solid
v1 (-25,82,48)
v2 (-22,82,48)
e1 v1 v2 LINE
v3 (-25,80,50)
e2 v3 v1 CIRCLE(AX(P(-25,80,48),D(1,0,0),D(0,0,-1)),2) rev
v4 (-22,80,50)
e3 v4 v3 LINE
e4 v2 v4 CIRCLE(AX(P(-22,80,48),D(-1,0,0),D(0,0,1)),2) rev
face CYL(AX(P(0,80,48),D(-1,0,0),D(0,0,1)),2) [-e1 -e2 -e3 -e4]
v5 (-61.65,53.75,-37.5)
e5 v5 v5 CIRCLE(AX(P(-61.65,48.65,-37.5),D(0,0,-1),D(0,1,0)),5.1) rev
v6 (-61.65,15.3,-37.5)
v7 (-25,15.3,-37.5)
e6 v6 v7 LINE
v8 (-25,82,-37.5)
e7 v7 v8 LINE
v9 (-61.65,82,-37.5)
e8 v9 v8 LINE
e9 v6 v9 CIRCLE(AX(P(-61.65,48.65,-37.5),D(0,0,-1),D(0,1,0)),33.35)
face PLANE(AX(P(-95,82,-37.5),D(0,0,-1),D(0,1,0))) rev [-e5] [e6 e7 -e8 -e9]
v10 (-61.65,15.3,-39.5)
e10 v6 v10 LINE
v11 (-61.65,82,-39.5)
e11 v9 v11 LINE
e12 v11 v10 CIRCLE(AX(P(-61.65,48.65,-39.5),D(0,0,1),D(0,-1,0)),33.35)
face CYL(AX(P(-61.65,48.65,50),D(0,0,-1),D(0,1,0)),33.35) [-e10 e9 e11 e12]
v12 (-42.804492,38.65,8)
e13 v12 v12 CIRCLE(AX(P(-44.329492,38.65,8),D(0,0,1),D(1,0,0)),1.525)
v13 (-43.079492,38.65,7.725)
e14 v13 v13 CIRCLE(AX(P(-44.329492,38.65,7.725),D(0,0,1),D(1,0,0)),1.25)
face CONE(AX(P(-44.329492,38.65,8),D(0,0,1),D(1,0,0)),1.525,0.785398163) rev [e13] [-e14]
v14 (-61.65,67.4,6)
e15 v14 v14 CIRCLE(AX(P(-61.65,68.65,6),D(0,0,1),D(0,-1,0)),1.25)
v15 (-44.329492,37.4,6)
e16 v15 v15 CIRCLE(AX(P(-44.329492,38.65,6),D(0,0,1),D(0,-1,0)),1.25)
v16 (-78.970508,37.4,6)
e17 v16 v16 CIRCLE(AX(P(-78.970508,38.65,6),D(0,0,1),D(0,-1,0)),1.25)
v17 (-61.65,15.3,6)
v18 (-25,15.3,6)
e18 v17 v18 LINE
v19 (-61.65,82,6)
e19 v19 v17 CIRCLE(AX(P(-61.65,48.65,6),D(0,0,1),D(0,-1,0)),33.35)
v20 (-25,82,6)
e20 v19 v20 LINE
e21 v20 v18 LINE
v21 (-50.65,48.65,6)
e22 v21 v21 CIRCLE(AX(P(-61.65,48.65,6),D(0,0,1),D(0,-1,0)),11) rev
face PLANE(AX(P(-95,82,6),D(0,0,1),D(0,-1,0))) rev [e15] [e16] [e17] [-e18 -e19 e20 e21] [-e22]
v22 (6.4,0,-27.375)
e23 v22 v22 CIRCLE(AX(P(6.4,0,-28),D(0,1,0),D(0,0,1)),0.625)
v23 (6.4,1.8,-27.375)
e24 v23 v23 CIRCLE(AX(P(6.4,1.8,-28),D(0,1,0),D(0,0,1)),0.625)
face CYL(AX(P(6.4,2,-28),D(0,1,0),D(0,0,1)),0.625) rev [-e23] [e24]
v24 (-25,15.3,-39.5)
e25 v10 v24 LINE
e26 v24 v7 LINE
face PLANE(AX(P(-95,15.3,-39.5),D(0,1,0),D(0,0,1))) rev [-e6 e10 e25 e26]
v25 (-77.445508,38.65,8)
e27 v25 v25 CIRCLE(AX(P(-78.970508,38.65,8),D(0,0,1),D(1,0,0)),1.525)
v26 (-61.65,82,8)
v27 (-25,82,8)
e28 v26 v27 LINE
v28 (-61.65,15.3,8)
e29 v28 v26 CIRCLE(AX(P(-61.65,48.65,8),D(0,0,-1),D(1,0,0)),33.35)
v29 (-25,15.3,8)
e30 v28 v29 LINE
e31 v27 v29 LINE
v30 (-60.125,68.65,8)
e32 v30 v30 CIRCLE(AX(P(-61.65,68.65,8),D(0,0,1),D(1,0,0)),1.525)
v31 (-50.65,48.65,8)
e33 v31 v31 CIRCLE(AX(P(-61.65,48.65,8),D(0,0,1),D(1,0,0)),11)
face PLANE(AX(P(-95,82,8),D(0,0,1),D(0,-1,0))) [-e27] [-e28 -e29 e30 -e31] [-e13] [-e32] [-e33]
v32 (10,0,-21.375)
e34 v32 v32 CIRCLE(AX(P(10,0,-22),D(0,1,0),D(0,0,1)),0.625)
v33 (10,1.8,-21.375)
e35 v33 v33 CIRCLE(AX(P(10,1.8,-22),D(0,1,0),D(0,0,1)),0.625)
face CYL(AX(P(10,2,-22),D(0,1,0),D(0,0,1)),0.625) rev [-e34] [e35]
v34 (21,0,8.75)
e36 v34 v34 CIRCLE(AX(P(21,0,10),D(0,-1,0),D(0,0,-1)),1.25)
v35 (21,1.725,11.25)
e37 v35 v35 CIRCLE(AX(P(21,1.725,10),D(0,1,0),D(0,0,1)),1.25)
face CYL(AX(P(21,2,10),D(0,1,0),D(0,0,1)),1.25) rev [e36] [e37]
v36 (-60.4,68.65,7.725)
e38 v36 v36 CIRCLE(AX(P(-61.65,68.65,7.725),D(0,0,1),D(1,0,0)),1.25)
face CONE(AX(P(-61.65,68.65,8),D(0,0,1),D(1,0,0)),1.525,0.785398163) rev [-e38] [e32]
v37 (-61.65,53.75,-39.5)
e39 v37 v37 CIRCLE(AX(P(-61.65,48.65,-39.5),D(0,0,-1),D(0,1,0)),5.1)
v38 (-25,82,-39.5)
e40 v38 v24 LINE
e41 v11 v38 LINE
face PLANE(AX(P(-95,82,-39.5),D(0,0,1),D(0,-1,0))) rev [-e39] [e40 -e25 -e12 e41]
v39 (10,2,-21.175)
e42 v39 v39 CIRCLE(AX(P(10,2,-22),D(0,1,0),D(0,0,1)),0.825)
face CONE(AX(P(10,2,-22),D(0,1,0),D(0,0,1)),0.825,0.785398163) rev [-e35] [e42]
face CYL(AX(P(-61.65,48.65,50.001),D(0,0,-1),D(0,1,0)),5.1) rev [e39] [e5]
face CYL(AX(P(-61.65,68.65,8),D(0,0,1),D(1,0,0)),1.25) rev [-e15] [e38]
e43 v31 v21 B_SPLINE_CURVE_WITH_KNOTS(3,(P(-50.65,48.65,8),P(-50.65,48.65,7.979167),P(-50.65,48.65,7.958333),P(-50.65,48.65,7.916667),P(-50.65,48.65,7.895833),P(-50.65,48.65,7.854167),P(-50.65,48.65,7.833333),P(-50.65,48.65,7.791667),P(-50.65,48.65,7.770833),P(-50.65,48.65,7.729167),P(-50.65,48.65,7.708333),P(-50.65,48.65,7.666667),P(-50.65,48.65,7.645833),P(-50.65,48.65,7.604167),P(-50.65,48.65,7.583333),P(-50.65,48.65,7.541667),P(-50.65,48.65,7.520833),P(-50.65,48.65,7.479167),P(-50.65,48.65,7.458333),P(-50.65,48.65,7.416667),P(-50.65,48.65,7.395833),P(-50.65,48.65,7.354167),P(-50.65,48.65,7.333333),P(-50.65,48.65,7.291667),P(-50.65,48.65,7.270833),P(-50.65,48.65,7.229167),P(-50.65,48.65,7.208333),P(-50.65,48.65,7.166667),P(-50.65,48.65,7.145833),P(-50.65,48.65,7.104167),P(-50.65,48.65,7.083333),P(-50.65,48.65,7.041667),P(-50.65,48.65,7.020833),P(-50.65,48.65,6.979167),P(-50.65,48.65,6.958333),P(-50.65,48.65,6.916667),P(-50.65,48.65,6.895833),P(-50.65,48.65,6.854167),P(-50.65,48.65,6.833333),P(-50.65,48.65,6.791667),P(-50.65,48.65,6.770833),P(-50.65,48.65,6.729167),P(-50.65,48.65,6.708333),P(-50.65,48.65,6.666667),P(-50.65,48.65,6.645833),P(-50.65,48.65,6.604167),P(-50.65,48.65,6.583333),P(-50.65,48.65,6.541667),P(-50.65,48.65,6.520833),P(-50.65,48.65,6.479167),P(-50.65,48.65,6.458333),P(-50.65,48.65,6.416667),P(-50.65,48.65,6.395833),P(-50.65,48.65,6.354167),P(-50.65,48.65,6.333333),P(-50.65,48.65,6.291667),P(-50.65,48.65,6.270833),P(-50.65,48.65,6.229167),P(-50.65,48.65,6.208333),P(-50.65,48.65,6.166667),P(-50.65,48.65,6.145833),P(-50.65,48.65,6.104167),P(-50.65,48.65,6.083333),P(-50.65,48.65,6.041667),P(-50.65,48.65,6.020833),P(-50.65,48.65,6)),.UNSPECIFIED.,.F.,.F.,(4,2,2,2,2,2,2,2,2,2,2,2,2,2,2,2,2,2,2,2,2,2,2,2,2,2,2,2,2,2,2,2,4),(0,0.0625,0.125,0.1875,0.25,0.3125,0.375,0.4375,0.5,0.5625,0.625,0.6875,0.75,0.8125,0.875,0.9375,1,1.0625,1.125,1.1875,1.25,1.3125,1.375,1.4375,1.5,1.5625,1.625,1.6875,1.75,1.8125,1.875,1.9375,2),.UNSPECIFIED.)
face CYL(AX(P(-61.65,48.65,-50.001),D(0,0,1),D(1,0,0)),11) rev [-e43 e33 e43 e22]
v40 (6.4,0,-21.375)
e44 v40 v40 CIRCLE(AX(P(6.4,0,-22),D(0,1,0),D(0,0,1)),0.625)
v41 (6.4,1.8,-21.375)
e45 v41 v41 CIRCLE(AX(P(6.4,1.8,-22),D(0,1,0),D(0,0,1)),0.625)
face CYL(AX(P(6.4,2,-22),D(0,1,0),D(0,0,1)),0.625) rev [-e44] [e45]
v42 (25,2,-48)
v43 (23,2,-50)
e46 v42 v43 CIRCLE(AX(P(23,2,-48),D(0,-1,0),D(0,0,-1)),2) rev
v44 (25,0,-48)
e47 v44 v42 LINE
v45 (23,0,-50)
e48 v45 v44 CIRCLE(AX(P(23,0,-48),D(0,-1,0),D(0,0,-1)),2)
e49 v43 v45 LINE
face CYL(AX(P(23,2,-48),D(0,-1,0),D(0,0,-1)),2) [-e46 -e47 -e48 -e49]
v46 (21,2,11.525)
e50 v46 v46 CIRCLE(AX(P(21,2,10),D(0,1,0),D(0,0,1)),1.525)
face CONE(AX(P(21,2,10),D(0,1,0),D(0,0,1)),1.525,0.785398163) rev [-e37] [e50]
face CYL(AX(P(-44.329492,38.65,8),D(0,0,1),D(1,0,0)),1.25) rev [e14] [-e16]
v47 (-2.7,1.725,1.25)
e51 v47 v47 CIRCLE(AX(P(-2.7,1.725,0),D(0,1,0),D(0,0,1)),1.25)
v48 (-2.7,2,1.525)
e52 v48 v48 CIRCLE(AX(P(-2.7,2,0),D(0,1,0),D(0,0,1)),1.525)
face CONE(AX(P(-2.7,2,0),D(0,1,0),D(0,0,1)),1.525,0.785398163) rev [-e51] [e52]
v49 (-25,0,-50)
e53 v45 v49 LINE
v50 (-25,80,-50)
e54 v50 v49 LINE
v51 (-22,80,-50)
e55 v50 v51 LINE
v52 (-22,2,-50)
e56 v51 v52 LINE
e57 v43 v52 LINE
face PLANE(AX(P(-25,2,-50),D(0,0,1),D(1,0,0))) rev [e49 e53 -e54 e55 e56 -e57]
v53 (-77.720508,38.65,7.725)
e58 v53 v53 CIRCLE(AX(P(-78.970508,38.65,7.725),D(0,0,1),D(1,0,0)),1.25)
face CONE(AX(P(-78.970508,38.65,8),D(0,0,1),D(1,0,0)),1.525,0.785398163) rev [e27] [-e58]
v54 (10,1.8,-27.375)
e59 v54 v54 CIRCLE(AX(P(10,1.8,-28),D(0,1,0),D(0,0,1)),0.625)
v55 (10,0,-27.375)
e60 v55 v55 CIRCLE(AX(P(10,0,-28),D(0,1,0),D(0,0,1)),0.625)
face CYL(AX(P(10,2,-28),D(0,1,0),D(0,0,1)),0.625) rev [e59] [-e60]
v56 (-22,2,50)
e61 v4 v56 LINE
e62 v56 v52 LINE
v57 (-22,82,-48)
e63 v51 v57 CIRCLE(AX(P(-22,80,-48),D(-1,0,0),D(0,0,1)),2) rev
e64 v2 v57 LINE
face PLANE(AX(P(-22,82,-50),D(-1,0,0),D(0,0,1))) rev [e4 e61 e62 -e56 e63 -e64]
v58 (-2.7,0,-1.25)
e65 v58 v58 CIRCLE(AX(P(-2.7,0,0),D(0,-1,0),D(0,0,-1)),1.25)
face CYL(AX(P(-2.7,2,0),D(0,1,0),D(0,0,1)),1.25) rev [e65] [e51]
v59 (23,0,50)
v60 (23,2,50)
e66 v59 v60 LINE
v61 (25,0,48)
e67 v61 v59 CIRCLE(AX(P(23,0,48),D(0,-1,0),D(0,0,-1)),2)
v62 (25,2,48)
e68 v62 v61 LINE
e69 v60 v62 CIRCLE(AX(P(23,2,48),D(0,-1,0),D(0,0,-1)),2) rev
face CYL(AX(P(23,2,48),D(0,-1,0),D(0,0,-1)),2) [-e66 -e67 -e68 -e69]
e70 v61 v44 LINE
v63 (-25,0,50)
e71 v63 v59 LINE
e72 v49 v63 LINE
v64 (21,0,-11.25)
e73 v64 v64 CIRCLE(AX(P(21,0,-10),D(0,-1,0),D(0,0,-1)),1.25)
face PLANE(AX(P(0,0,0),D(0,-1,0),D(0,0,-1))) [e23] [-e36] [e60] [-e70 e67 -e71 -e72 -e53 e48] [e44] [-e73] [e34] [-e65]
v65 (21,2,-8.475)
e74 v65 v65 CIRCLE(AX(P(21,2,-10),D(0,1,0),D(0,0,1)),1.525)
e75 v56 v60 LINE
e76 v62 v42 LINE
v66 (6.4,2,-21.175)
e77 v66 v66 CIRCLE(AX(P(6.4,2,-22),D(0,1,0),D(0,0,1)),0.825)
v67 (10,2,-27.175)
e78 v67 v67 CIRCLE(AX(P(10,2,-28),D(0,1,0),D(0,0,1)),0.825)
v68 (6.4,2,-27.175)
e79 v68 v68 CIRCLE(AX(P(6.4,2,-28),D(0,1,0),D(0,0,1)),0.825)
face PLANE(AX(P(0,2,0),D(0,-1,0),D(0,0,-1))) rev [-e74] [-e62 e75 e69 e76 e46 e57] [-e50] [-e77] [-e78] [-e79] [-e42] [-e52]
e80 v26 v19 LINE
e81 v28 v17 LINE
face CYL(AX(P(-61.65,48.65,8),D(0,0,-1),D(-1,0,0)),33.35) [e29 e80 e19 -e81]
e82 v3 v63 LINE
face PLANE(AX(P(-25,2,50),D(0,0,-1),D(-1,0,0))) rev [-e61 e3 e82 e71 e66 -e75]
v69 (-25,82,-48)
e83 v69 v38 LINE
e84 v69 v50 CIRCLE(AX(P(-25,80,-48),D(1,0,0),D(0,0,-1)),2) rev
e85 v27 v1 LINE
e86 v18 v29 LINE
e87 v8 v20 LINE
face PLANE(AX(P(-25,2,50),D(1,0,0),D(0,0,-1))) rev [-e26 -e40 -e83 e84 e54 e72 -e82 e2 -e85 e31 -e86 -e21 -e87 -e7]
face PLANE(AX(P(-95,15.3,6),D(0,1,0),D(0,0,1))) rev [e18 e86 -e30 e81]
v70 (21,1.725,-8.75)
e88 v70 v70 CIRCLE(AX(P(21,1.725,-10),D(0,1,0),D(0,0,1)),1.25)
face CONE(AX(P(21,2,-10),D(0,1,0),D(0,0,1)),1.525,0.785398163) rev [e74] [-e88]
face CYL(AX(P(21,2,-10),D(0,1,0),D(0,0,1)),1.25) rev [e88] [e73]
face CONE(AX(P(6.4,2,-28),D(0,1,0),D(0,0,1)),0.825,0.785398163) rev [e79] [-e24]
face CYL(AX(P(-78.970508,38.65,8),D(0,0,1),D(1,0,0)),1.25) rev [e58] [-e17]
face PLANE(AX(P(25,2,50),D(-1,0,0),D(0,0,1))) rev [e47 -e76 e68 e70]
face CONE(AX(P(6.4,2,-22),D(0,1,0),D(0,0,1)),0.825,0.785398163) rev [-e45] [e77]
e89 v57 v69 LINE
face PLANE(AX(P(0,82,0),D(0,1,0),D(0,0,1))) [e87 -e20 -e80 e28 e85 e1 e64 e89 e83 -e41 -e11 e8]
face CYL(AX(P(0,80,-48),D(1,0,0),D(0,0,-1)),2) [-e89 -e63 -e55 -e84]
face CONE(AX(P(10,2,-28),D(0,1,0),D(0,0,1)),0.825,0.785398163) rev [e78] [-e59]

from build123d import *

# Parameters (mm, degrees)
SKETCH_1_W                   = 50
SKETCH_1_H                   = 100
EXTRUDE_1_DEPTH              = 2
SKETCH_2_W                   = 3
SKETCH_2_H                   = 100
EXTRUDE_2_DEPTH              = 80
SKETCH_3_W                   = 2
SKETCH_3_H                   = 66.7
EXTRUDE_3_DEPTH              = 70
CUT_EXTRUDE_4_REACH          = 162.465
SKETCH_8_W                   = 2
SKETCH_8_H                   = 66.7
EXTRUDE_4_DEPTH              = 70
CUT_EXTRUDE_5_REACH          = 140.25
HOLE_WIZARD_M3_1_D           = 2.5
HOLE_WIZARD_M3_1_DEPTH       = 2
HOLE_WIZARD_M3_1_CSINK_D     = 3.05
HOLE_WIZARD_M3_1_CSINK_ANGLE = 90
FILLET_1_R                   = 2
CUT_EXTRUDE_6_REACH          = 140.25
SKETCH_12_R                  = 11
CUT_EXTRUDE_7_REACH          = 162.465
SKETCH_13_R                  = 14.5
SKETCH_14_W                  = 2
SKETCH_14_H                  = 66.7
EXTRUDE_5_DEPTH              = 70
CUT_EXTRUDE_8_REACH          = 156.14
SKETCH_15_R                  = 5.1
CUT_EXTRUDE_9_DEPTH          = 155.140358116
CUT_EXTRUDE_9_DEPTH_BACK     = 155.140358116
SKETCH_19_W                  = 2
SKETCH_19_H                  = 66.7
CUT_EXTRUDE_10_DEPTH         = 119.844436134
FILLET_2_R                   = 2
HOLE_WIZARD_M3_3_D           = 2.5
HOLE_WIZARD_M3_3_CSINK_D     = 3.05
HOLE_WIZARD_M3_3_CSINK_ANGLE = 90


# Read off the part's stored shape, not the designer's step: M1.6 螺纹孔1, M1.6 螺纹孔2
with BuildPart() as part:
    # 草图1 → 凸台-拉伸1 (new body)
    with BuildSketch(Plane(origin=(0, 0, 0), x_dir=(1, 0, 0), z_dir=(0, 1, 0))):
        Rectangle(SKETCH_1_W, SKETCH_1_H)
    extrude(amount=EXTRUDE_1_DEPTH)

    # 草图2 → 凸台-拉伸2 (add)
    with BuildSketch(Plane(origin=(0, 2, 0), x_dir=(1, 0, 0), z_dir=(0, 1, 0))):
        with Locations((-23.5, 0)):
            Rectangle(SKETCH_2_W, SKETCH_2_H)
    extrude(amount=EXTRUDE_2_DEPTH)

    # 草图3 → 凸台-拉伸3 (add)
    with BuildSketch(Plane.ZY.offset(25)):
        with Locations((-49, 48.65)):
            Rectangle(SKETCH_3_W, SKETCH_3_H)
    extrude(amount=EXTRUDE_3_DEPTH)

    # 草图4 → 切除-拉伸4 (cut, up to next)
    with BuildSketch(Plane(origin=(0, 0, -50), x_dir=(-1, 0, 0), z_dir=(0, 0, -1)), mode=Mode.PRIVATE) as cut_extrude_4_sk1:
        with BuildLine():
            Line((95, 82), (61.65, 82))
            ThreePointArc((61.65, 82), (85.232011153, 72.232011153), (95, 48.65))
            Line((95, 48.65), (95, 82))
        make_face()
    cut_extrude_4_tool1 = extrude(cut_extrude_4_sk1.sketch, amount=-CUT_EXTRUDE_4_REACH, mode=Mode.PRIVATE) & part.part
    # 草图4 → 切除-拉伸4 (cut, up to next)
    with BuildSketch(Plane(origin=(0, 0, -50), x_dir=(-1, 0, 0), z_dir=(0, 0, -1)), mode=Mode.PRIVATE) as cut_extrude_4_sk2:
        with BuildLine():
            ThreePointArc((95, 48.65), (85.232011153, 25.067988847), (61.65, 15.3))
            Line((61.65, 15.3), (95, 15.3))
            Line((95, 15.3), (95, 48.65))
        make_face()
    cut_extrude_4_tool2 = extrude(cut_extrude_4_sk2.sketch, amount=-CUT_EXTRUDE_4_REACH, mode=Mode.PRIVATE) & part.part
    add(cut_extrude_4_tool1.solids().sort_by_distance((-87.550679, 74.550679, -50))[0], mode=Mode.SUBTRACT)
    add(cut_extrude_4_tool2.solids().sort_by_distance((-87.550679, 22.749321, -50))[0], mode=Mode.SUBTRACT)

    # 草图8 → 凸台-拉伸4 (add)
    with BuildSketch(Plane.ZY.offset(25)):
        with Locations((7, 48.65)):
            Rectangle(SKETCH_8_W, SKETCH_8_H)
    extrude(amount=EXTRUDE_4_DEPTH)

    # 草图9 → 切除-拉伸5 (cut, up to next)
    with BuildSketch(Plane.XY.offset(8), mode=Mode.PRIVATE) as cut_extrude_5_sk1:
        with BuildLine():
            ThreePointArc((-95, 48.65), (-85.232011153, 72.232011153), (-61.65, 82))
            Line((-61.65, 82), (-95, 82))
            Line((-95, 82), (-95, 48.65))
        make_face()
    cut_extrude_5_tool1 = extrude(cut_extrude_5_sk1.sketch, amount=-CUT_EXTRUDE_5_REACH, mode=Mode.PRIVATE) & part.part
    # 草图9 → 切除-拉伸5 (cut, up to next)
    with BuildSketch(Plane.XY.offset(8), mode=Mode.PRIVATE) as cut_extrude_5_sk2:
        with BuildLine():
            ThreePointArc((-61.65, 15.3), (-85.232011153, 25.067988847), (-95, 48.65))
            Line((-95, 48.65), (-95, 15.3))
            Line((-95, 15.3), (-61.65, 15.3))
        make_face()
    cut_extrude_5_tool2 = extrude(cut_extrude_5_sk2.sketch, amount=-CUT_EXTRUDE_5_REACH, mode=Mode.PRIVATE) & part.part
    add(cut_extrude_5_tool1.solids().sort_by_distance((-87.550679, 74.550679, 8))[0], mode=Mode.SUBTRACT)
    add(cut_extrude_5_tool2.solids().sort_by_distance((-87.550679, 22.749321, 8))[0], mode=Mode.SUBTRACT)

    # M3 螺纹孔1
    with Locations(Plane.XY.offset(8)):
        with Locations((-78.970508076, 38.65), (-61.65, 68.65), (-44.329491924, 38.65)):
            CounterSinkHole(HOLE_WIZARD_M3_1_D / 2, HOLE_WIZARD_M3_1_CSINK_D / 2, depth=HOLE_WIZARD_M3_1_DEPTH, counter_sink_angle=HOLE_WIZARD_M3_1_CSINK_ANGLE)

    # 圆角1
    fillet_1_edges = [part.edges().sort_by_distance(p)[0] for p in [
        (-23.5, 82, 50),
        (25, 1, 50),
        (25, 1, -50),
    ]]
    fillet(fillet_1_edges, radius=FILLET_1_R)

    # 草图12 → 切除-拉伸6 (cut, up to next)
    with BuildSketch(Plane.XY.offset(8), mode=Mode.PRIVATE) as cut_extrude_6_sk1:
        with Locations((-61.65, 48.65)):
            Circle(SKETCH_12_R)
    cut_extrude_6_tool1 = extrude(cut_extrude_6_sk1.sketch, amount=-CUT_EXTRUDE_6_REACH, mode=Mode.PRIVATE) & part.part
    add(cut_extrude_6_tool1.solids().sort_by_distance((-61.65, 48.65, 8))[0], mode=Mode.SUBTRACT)

    # 草图13 → 切除-拉伸7 (cut, up to next)
    with BuildSketch(Plane(origin=(0, 0, -50), x_dir=(-1, 0, 0), z_dir=(0, 0, -1)), mode=Mode.PRIVATE) as cut_extrude_7_sk1:
        with Locations((61.65, 48.65)):
            Circle(SKETCH_13_R)
    cut_extrude_7_tool1 = extrude(cut_extrude_7_sk1.sketch, amount=-CUT_EXTRUDE_7_REACH, mode=Mode.PRIVATE) & part.part
    add(cut_extrude_7_tool1.solids().sort_by_distance((-61.65, 48.65, -50))[0], mode=Mode.SUBTRACT)

    # 草图14 → 凸台-拉伸5 (add)
    with BuildSketch(Plane.ZY.offset(25)):
        with Locations((-38.5, 48.65)):
            Rectangle(SKETCH_14_W, SKETCH_14_H)
    extrude(amount=EXTRUDE_5_DEPTH)

    # 草图15 → 切除-拉伸8 (cut, up to next)
    with BuildSketch(Plane(origin=(0, 0, -39.5), x_dir=(-1, 0, 0), z_dir=(0, 0, -1)), mode=Mode.PRIVATE) as cut_extrude_8_sk1:
        with Locations(Location((61.65, 48.65, 0), (0, 0, 90))):
            Circle(SKETCH_15_R)
    cut_extrude_8_tool1 = extrude(cut_extrude_8_sk1.sketch, amount=-CUT_EXTRUDE_8_REACH, mode=Mode.PRIVATE) & part.part
    add(cut_extrude_8_tool1.solids().sort_by_distance((-61.65, 48.65, -39.5))[0], mode=Mode.SUBTRACT)

    # 草图18 → 切除-拉伸9 (cut, two sides: drawn at the far end of the back side and taken through both)
    with BuildSketch(Plane(origin=(0, 0, -39.5), x_dir=(-1, 0, 0), z_dir=(0, 0, -1)).offset(-CUT_EXTRUDE_9_DEPTH_BACK)):
        with BuildLine():
            Line((95, 15.3), (95, 48.65))
            ThreePointArc((95, 48.65), (85.232011153, 25.067988847), (61.65, 15.3))
            Line((61.65, 15.3), (95, 15.3))
        make_face()
        with BuildLine():
            Line((95, 48.65), (95, 82))
            Line((95, 82), (61.65, 82))
            ThreePointArc((61.65, 82), (85.232011153, 72.232011153), (95, 48.65))
        make_face()
    extrude(amount=CUT_EXTRUDE_9_DEPTH + CUT_EXTRUDE_9_DEPTH_BACK, mode=Mode.SUBTRACT)

    # 草图19 → 切除-拉伸10 (cut, through all)
    with BuildSketch(Plane.ZY.offset(25)):
        with Locations((-49, 48.65)):
            Rectangle(SKETCH_19_W, SKETCH_19_H)
    extrude(amount=CUT_EXTRUDE_10_DEPTH, mode=Mode.SUBTRACT)

    # 圆角2
    fillet_2_edges = [part.edges().sort_by_distance(p)[0] for p in [
        (-23.5, 82, -50),
    ]]
    fillet(fillet_2_edges, radius=FILLET_2_R)

    # M3 螺纹孔3 (through all)
    with Locations(Plane(origin=(0, 2, 0), x_dir=(1, 0, 0), z_dir=(0, 1, 0))):
        with Locations((-2.7, 0), (21, 10), (21, -10)):
            CounterSinkHole(HOLE_WIZARD_M3_3_D / 2, HOLE_WIZARD_M3_3_CSINK_D / 2, counter_sink_angle=HOLE_WIZARD_M3_3_CSINK_ANGLE)

    # M1.6 螺纹孔1 outline → M1.6 螺纹孔1 (revolve, cut)
    with BuildSketch(Plane(origin=(10, 0, -28), x_dir=(1, 0, 0), z_dir=(0, 0, 1))):
        Polygon((0, 0), (0.625, 0), (0.625, 1.8), (0.825, 2), (0, 2), align=None)
    revolve(axis=Axis((10, 0, -28), (0, 1, 0)), mode=Mode.SUBTRACT)

    # Hole Wizard M1.6 _1 2 outline → Hole Wizard M1.6 _1 2 (revolve, cut)
    with BuildSketch(Plane(origin=(6.4, 0, -28), x_dir=(1, 0, 0), z_dir=(0, 0, 1))):
        Polygon((0, 0), (0.625, 0), (0.625, 1.8), (0.825, 2), (0, 2), align=None)
    revolve(axis=Axis((6.4, 0, -28), (0, 1, 0)), mode=Mode.SUBTRACT)

    # M1.6 螺纹孔2 outline → M1.6 螺纹孔2 (revolve, cut)
    with BuildSketch(Plane(origin=(10, 0, -22), x_dir=(1, 0, 0), z_dir=(0, 0, 1))):
        Polygon((0, 0), (0.625, 0), (0.625, 1.8), (0.825, 2), (0, 2), align=None)
    revolve(axis=Axis((10, 0, -22), (0, 1, 0)), mode=Mode.SUBTRACT)

    # Hole Wizard M1.6 _2 2 outline → Hole Wizard M1.6 _2 2 (revolve, cut)
    with BuildSketch(Plane(origin=(6.4, 0, -22), x_dir=(1, 0, 0), z_dir=(0, 0, 1))):
        Polygon((0, 0), (0.625, 0), (0.625, 1.8), (0.825, 2), (0, 2), align=None)
    revolve(axis=Axis((6.4, 0, -22), (0, 1, 0)), mode=Mode.SUBTRACT)


solid = part.part
